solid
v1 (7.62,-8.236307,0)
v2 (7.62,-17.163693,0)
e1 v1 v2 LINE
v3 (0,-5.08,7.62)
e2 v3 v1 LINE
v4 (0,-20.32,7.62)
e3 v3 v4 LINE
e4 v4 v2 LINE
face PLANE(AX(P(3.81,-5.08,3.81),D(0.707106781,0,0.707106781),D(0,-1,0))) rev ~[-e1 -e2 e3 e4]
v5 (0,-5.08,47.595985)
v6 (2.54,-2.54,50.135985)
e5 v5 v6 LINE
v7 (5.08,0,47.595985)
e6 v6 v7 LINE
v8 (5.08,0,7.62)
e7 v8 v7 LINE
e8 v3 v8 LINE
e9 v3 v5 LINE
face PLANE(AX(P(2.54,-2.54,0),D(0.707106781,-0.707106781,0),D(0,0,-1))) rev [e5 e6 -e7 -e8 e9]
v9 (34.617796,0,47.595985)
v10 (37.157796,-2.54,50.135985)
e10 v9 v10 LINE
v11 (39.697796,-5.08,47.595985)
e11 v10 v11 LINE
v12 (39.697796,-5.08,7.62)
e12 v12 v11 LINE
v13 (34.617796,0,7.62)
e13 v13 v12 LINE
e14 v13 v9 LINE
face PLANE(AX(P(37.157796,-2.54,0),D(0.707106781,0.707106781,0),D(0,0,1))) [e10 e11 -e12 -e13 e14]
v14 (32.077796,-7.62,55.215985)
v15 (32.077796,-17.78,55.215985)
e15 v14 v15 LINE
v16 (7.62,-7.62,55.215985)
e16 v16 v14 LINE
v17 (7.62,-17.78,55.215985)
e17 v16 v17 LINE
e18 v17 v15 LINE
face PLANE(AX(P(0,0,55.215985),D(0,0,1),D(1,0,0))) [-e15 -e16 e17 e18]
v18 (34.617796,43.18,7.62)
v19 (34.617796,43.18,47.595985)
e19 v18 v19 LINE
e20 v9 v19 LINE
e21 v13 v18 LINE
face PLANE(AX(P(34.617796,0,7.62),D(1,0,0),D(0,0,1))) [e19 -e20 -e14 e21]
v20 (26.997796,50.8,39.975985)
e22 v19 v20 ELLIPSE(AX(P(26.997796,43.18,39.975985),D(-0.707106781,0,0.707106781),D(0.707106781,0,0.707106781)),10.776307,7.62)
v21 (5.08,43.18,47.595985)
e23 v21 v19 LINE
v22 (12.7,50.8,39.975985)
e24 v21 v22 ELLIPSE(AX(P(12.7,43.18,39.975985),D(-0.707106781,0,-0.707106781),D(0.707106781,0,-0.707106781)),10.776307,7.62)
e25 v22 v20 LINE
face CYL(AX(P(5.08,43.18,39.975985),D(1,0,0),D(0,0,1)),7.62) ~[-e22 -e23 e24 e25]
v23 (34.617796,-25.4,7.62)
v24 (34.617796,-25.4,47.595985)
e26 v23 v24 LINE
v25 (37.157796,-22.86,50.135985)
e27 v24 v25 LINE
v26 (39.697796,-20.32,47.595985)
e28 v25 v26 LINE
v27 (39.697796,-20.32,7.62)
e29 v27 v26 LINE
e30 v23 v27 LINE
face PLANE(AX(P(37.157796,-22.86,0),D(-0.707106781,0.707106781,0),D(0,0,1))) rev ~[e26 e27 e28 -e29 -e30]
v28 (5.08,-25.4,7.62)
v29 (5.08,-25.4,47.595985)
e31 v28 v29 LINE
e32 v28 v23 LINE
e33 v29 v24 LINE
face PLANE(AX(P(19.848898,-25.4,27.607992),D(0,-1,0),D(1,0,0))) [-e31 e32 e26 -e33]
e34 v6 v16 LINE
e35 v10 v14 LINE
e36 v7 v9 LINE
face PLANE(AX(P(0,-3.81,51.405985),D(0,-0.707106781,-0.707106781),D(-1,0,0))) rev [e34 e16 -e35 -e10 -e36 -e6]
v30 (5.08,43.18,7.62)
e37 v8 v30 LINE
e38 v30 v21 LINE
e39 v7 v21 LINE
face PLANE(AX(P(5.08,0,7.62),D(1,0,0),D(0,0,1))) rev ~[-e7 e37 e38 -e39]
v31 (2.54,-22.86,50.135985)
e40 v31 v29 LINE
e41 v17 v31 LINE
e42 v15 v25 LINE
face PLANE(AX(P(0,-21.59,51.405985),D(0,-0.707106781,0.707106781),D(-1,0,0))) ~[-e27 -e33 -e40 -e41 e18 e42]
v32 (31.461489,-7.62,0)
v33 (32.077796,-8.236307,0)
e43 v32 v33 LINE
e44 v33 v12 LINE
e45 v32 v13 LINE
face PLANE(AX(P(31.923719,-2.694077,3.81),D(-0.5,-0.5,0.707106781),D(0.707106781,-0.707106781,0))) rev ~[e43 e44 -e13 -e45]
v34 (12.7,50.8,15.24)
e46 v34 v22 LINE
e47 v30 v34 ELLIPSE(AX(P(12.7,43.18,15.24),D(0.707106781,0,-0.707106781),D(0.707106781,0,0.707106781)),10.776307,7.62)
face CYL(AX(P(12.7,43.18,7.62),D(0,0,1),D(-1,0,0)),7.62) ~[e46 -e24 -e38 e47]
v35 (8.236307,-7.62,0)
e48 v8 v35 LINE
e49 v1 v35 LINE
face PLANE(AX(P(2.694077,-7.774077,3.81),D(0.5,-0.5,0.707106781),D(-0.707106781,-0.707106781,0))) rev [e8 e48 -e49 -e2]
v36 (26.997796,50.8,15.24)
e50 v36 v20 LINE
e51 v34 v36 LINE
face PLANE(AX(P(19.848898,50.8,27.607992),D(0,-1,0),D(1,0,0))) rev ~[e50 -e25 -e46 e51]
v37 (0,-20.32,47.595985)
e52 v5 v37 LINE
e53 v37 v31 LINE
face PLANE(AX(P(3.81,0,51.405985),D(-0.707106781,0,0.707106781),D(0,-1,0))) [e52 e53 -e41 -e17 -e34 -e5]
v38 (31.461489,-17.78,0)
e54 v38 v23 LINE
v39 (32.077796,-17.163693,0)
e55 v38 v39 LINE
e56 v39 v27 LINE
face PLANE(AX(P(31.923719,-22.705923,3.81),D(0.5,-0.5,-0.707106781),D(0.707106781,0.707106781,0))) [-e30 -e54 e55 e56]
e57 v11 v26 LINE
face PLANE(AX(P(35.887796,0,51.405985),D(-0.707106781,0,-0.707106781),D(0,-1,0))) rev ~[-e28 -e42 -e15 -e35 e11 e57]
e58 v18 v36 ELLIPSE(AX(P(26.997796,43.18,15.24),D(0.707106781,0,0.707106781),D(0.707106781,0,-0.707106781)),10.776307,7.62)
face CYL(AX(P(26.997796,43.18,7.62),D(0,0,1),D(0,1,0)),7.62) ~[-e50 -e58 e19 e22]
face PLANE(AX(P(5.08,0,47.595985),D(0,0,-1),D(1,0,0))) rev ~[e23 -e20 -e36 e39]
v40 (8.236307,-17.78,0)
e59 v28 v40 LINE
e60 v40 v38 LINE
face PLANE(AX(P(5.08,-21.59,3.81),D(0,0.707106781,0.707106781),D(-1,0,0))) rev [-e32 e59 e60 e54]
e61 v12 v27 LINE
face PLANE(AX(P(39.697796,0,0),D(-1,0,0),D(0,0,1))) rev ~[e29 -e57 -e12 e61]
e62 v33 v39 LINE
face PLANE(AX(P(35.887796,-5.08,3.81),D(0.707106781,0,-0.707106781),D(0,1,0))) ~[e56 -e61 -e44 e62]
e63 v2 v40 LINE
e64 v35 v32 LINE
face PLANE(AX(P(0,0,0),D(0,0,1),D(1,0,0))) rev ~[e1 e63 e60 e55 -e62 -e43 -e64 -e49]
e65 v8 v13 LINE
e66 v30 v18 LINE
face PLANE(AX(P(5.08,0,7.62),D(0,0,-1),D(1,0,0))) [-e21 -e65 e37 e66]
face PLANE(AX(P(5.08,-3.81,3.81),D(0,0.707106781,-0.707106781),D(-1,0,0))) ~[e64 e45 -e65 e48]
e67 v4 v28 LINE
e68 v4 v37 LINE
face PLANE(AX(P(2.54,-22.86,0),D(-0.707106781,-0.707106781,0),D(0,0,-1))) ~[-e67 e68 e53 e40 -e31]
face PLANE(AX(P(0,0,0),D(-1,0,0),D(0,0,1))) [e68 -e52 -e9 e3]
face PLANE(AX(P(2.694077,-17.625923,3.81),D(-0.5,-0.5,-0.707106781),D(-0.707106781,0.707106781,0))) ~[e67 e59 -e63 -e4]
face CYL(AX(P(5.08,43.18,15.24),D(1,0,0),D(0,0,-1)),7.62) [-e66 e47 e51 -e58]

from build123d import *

# Parameters (mm, degrees)
F0_W     = 39.6977961063
F0_H     = 55.2159845829
F1_DEPTH = 25.4
F2_SIZE  = 7.62
F3_SIZE  = 5.08
F4_SIZE  = 7.62
F5_DEPTH = 50.8
F6_R     = 7.62


with BuildPart() as f1:
    # F0 (on Front) → F1 (new body)
    with BuildSketch(Plane.XZ):
        with Locations((19.8488980532, 27.6079922915)):
            Rectangle(F0_W, F0_H)
    extrude(amount=F1_DEPTH)

    # F2
    f2_edges = [f1.edges().sort_by_distance(p)[0] for p in [
        (19.848898, -25.4, 55.215985),
        (0, -12.7, 55.215985),
        (39.697796, -12.7, 55.215985),
        (19.848898, 0, 55.215985),
    ]]
    chamfer(f2_edges, length=F2_SIZE)

    # F3
    f3_edges = [f1.edges().sort_by_distance(p)[0] for p in [
        (39.697796, 0, 23.797992),
        (0, -25.4, 23.797992),
        (39.697796, -25.4, 23.797992),
        (0, 0, 23.797992),
    ]]
    chamfer(f3_edges, length=F3_SIZE)

    # F4
    f4_edges = [f1.edges().sort_by_distance(p)[0] for p in [
        (2.54, -2.54, 0),
        (39.697796, -12.7, 0),
        (0, -12.7, 0),
        (2.54, -22.86, 0),
        (19.848898, -25.4, 0),
        (19.848898, 0, 0),
        (37.157796, -2.54, 0),
        (37.157796, -22.86, 0),
    ]]
    chamfer(f4_edges, length=F4_SIZE)

    # F5 (add): a face of the model
    f5_faces = [f1.faces().sort_by_distance(p)[0] for p in [
        (19.8488980532, 0, 27.6079922915),
    ]]
    extrude(f5_faces, amount=F5_DEPTH)

    # F6
    f6_edges = [f1.edges().sort_by_distance(p)[0] for p in [
        (19.848898, 50.8, 7.62),
        (19.848898, 50.8, 47.595985),
        (5.08, 50.8, 27.607992),
        (34.617796, 50.8, 27.607992),
    ]]
    fillet(f6_edges, radius=F6_R)


solid = f1.part
